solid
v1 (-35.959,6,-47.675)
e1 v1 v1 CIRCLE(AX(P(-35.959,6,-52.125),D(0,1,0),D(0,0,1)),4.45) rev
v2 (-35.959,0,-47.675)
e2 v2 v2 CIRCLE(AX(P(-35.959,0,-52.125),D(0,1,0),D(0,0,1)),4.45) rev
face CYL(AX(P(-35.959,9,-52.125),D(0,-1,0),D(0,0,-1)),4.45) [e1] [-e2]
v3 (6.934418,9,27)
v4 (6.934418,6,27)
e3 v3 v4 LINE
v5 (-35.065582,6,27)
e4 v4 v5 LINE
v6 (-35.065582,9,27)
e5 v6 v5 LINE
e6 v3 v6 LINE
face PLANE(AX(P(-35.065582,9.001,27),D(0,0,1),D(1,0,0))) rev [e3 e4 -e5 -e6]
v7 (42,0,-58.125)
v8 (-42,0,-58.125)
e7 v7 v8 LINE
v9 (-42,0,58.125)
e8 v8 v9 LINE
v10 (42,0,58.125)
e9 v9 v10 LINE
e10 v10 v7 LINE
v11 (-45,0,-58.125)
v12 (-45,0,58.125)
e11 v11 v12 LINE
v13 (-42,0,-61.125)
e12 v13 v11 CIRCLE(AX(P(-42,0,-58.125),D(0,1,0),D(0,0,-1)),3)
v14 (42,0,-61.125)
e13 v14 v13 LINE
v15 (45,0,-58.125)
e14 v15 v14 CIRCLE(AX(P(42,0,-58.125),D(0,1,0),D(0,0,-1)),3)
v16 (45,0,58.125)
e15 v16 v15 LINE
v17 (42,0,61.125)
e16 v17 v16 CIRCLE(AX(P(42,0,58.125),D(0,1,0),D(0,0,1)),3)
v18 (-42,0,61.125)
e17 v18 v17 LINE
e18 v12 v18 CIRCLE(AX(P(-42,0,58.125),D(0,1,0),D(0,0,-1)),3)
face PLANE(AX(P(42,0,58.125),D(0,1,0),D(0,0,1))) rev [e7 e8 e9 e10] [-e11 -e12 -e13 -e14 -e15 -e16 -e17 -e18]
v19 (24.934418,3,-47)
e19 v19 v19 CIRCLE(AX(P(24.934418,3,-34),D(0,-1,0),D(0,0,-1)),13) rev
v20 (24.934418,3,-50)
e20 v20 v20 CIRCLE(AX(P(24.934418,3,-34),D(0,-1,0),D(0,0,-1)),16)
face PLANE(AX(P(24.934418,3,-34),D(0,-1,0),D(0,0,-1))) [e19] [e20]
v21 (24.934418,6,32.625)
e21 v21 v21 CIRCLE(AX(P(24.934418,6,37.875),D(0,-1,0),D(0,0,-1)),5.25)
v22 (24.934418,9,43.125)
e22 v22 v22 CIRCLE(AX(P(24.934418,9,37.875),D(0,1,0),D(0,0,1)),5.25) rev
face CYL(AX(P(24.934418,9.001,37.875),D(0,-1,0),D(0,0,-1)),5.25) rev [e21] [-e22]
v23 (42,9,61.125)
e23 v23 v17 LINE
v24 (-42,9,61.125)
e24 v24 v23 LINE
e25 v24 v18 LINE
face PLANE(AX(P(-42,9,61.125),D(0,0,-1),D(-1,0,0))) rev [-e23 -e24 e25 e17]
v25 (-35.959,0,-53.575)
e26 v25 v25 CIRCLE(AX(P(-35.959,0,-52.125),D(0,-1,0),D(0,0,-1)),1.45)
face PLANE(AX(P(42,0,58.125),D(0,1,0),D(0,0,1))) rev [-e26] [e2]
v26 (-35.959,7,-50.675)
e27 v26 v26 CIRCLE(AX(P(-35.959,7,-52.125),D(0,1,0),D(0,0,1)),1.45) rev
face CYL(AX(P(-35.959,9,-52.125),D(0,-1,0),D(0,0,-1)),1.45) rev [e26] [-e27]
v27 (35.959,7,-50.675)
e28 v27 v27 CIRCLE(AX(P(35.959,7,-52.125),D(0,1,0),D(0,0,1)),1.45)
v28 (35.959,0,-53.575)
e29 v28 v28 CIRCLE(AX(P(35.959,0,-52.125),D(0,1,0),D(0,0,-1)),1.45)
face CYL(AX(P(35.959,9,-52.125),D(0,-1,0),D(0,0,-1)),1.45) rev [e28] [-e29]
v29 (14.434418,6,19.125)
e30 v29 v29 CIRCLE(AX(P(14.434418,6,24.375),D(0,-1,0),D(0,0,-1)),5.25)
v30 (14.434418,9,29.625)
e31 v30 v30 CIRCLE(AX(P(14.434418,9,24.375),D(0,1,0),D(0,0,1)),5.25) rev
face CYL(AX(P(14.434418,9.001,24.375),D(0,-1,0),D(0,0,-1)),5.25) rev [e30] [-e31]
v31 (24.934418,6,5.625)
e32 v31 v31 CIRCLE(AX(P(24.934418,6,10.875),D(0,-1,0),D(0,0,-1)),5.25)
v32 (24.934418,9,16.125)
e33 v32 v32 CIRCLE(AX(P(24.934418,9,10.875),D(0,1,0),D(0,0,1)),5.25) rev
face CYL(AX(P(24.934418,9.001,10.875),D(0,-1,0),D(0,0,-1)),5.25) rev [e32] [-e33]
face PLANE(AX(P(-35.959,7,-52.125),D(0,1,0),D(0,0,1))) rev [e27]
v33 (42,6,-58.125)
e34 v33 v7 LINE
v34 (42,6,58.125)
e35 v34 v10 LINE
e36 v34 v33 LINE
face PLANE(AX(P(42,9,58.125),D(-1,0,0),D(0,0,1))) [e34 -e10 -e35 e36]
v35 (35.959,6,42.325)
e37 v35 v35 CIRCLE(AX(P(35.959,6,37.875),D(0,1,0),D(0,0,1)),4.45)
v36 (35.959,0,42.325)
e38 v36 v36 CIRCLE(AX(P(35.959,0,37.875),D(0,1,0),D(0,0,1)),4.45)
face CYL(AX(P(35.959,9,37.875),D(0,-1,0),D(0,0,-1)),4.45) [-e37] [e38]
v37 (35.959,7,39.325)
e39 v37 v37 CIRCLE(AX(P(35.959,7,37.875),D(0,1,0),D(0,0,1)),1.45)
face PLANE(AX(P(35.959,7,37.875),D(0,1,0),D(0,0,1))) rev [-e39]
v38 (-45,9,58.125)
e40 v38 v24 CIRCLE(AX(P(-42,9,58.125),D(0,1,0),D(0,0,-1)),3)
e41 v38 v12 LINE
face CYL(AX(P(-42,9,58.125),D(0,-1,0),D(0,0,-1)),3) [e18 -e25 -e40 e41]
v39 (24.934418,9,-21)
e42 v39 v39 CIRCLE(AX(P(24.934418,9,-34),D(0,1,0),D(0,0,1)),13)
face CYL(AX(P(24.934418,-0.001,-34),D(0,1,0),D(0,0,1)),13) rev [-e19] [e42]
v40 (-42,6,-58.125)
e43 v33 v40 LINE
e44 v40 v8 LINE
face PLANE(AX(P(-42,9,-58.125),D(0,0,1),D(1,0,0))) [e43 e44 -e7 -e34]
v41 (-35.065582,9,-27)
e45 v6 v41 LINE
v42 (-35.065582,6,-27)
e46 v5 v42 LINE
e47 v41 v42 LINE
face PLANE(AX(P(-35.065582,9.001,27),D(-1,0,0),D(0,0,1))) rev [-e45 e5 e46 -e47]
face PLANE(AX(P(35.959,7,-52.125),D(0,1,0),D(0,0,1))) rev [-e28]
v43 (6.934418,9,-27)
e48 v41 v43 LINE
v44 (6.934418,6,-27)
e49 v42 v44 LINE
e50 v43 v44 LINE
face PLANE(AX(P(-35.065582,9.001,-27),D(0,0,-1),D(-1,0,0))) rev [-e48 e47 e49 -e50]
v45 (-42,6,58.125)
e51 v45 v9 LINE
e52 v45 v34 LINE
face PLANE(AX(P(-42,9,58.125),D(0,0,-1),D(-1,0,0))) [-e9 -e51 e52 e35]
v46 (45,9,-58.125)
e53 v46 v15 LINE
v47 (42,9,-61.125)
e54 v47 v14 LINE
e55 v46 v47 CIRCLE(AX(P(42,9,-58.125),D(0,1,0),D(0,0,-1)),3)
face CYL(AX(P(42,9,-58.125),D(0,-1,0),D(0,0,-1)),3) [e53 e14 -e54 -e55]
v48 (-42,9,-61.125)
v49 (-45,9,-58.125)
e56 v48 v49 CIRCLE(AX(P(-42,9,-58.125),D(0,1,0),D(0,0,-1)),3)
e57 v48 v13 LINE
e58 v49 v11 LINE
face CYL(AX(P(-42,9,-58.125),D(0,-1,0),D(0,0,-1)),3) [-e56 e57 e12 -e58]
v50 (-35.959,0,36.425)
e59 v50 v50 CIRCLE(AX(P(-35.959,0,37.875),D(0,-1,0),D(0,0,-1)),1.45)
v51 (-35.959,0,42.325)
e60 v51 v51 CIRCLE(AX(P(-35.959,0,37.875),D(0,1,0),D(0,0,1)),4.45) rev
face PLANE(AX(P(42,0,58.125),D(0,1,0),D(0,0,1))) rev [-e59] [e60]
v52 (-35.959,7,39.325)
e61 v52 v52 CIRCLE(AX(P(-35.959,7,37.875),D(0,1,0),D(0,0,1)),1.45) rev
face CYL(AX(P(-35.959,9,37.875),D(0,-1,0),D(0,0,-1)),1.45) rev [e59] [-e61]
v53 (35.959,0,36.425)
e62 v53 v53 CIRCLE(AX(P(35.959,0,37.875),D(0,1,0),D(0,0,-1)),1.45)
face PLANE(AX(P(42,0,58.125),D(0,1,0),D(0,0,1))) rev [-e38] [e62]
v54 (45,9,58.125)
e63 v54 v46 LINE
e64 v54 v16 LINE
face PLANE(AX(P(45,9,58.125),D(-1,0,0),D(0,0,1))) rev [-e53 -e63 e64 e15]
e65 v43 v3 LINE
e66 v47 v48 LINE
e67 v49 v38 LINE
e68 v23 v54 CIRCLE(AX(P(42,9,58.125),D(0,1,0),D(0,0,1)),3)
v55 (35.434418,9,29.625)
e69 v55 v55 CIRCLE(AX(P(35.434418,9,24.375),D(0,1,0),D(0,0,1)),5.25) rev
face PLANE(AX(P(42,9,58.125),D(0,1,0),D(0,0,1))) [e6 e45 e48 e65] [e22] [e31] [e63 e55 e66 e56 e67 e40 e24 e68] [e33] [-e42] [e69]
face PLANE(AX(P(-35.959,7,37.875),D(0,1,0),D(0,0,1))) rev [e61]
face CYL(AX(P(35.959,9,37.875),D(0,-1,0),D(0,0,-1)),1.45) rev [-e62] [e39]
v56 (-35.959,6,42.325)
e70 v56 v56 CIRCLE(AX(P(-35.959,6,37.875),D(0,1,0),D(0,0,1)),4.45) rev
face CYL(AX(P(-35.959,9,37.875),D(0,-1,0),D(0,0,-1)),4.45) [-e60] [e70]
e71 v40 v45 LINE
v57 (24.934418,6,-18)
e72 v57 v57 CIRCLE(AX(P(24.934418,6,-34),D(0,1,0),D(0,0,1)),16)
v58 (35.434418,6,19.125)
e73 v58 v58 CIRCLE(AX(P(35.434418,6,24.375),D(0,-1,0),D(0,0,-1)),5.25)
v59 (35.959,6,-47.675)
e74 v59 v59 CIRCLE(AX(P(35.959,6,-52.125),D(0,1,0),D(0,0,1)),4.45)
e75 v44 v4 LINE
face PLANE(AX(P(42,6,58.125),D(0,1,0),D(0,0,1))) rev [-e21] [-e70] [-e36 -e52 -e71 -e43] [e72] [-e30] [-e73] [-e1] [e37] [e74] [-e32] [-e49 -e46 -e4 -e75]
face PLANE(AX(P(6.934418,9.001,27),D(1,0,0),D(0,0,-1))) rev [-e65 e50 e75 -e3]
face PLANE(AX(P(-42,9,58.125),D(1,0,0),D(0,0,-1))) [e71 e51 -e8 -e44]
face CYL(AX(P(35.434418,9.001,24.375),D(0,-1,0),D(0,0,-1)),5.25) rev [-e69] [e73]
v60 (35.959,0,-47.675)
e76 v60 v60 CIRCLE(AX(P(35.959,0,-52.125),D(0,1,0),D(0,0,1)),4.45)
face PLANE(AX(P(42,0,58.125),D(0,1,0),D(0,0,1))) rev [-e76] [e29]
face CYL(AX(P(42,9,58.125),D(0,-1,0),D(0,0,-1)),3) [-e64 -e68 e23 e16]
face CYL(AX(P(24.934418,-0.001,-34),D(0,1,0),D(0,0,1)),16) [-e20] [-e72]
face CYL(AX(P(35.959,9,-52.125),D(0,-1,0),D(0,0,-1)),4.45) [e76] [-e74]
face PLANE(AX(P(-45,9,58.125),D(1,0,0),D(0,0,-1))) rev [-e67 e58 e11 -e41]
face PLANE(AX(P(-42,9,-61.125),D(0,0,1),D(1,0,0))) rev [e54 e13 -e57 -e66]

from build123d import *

# Parameters (mm, degrees)
BOSS_EXTRUDE1_DEPTH = 9
SKETCH2_R           = 1.45
CUT_EXTRUDE1_DEPTH  = 77.43471479
CUT_EXTRUDE2_REACH  = 78.435
SKETCH4_R           = 13
SHELL10_OUTLINE_W   = 84
SHELL10_OUTLINE_H   = 116.25
SHELL10_OUTLINE_R   = 4.45
SHELL10_OUTLINE_R_2 = 16
SHELL10_DEPTH       = 6
SKETCH5_R           = 16
CUT_EXTRUDE3_DEPTH  = 3
CUT_EXTRUDE4_REACH  = 78.14
SKETCH6_R           = 5.25
SKETCH6_W           = 42
SKETCH6_H           = 54
BOSS_EXTRUDE2_START = -2
SKETCH7_R           = 1.45
BOSS_EXTRUDE2_DEPTH = 2


# Read off the part's stored shape, not the designer's step: Shell10
with BuildPart() as part:
    # Sketch1 → Boss-Extrude1 (new body)
    with BuildSketch(Plane(origin=(0, 0, 0), x_dir=(1, 0, 0), z_dir=(0, 1, 0))):
        with BuildLine():
            Line((-42, -61.125), (42, -61.125))
            ThreePointArc((42, -61.125), (44.121320344, -60.246320344), (45, -58.125))
            Line((45, -58.125), (45, 58.125))
            ThreePointArc((45, 58.125), (44.121320344, 60.246320344), (42, 61.125))
            Line((42, 61.125), (-42, 61.125))
            ThreePointArc((-42, 61.125), (-44.121320344, 60.246320344), (-45, 58.125))
            Line((-45, 58.125), (-45, -58.125))
            ThreePointArc((-45, -58.125), (-44.121320344, -60.246320344), (-42, -61.125))
        make_face()
    extrude(amount=BOSS_EXTRUDE1_DEPTH)

    # Sketch2 → Cut-Extrude1 (cut, through all)
    with BuildSketch(Plane.XZ):
        with Locations(Location((-35.959, -52.125, 0), (0, 0, 270))):
            Circle(SKETCH2_R)
        with Locations(Location((-35.959, 37.875, 0), (0, 0, 270))):
            Circle(SKETCH2_R)
    cut_extrude1 = extrude(amount=-CUT_EXTRUDE1_DEPTH, mode=Mode.SUBTRACT)

    # Sketch4 → Cut-Extrude2 (cut, up to next)
    with BuildSketch(Plane(origin=(0, 9, 0), x_dir=(1, 0, 0), z_dir=(0, 1, 0)), mode=Mode.PRIVATE) as cut_extrude2_sk1:
        with Locations(Location((24.934417701, 34, 0), (0, 0, 270))):
            Circle(SKETCH4_R)
    cut_extrude2_tool1 = extrude(cut_extrude2_sk1.sketch, amount=-CUT_EXTRUDE2_REACH, mode=Mode.PRIVATE) & part.part
    add(cut_extrude2_tool1.solids().sort_by_distance((24.934418, 9, -34))[0], mode=Mode.SUBTRACT)

    # Mirror3: Cut-Extrude1 across plane
    add(cut_extrude1.mirror(Plane(origin=(0, 0, 0), x_dir=(0, 0, 1), z_dir=(1, 0, 0))), mode=Mode.SUBTRACT)

    # Shell10 outline → Shell10 (cut)
    with BuildSketch(Plane(origin=(0, 0, 0), x_dir=(1, 0, 0), z_dir=(0, 1, 0))):
        Rectangle(SHELL10_OUTLINE_W, SHELL10_OUTLINE_H)
        with Locations((-35.959, -37.875)):
            Circle(SHELL10_OUTLINE_R, mode=Mode.SUBTRACT)
        with Locations((35.959, -37.875)):
            Circle(SHELL10_OUTLINE_R, mode=Mode.SUBTRACT)
        with Locations((-35.959, 52.125)):
            Circle(SHELL10_OUTLINE_R, mode=Mode.SUBTRACT)
        with Locations((24.934417701, 34)):
            Circle(SHELL10_OUTLINE_R_2, mode=Mode.SUBTRACT)
        with Locations((35.959, 52.125)):
            Circle(SHELL10_OUTLINE_R, mode=Mode.SUBTRACT)
    extrude(amount=SHELL10_DEPTH, mode=Mode.SUBTRACT)

    # Sketch5 → Cut-Extrude3 (cut)
    with BuildSketch(Plane.XZ):
        with Locations(Location((24.934417701, -34, 0), (0, 0, 90))):
            Circle(SKETCH5_R)
    extrude(amount=-CUT_EXTRUDE3_DEPTH, mode=Mode.SUBTRACT)

    # Sketch6 → Cut-Extrude4 (cut, up to next)
    with BuildSketch(Plane.XZ.offset(-6), mode=Mode.PRIVATE) as cut_extrude4_sk1:
        with Locations(Location((35.434417701, 24.375, 0), (0, 0, 270))):
            Circle(SKETCH6_R)
    cut_extrude4_tool1 = extrude(cut_extrude4_sk1.sketch, amount=-CUT_EXTRUDE4_REACH, mode=Mode.PRIVATE) & part.part
    # Sketch6 → Cut-Extrude4 (cut, up to next)
    with BuildSketch(Plane.XZ.offset(-6), mode=Mode.PRIVATE) as cut_extrude4_sk2:
        with Locations(Location((14.434417701, 24.375, 0), (0, 0, 270))):
            Circle(SKETCH6_R)
    cut_extrude4_tool2 = extrude(cut_extrude4_sk2.sketch, amount=-CUT_EXTRUDE4_REACH, mode=Mode.PRIVATE) & part.part
    # Sketch6 → Cut-Extrude4 (cut, up to next)
    with BuildSketch(Plane.XZ.offset(-6), mode=Mode.PRIVATE) as cut_extrude4_sk3:
        with Locations(Location((24.934417701, 10.875, 0), (0, 0, 270))):
            Circle(SKETCH6_R)
    cut_extrude4_tool3 = extrude(cut_extrude4_sk3.sketch, amount=-CUT_EXTRUDE4_REACH, mode=Mode.PRIVATE) & part.part
    # Sketch6 → Cut-Extrude4 (cut, up to next)
    with BuildSketch(Plane.XZ.offset(-6), mode=Mode.PRIVATE) as cut_extrude4_sk4:
        with Locations(Location((24.934417701, 37.875, 0), (0, 0, 270))):
            Circle(SKETCH6_R)
    cut_extrude4_tool4 = extrude(cut_extrude4_sk4.sketch, amount=-CUT_EXTRUDE4_REACH, mode=Mode.PRIVATE) & part.part
    # Sketch6 → Cut-Extrude4 (cut, up to next)
    with BuildSketch(Plane.XZ.offset(-6), mode=Mode.PRIVATE) as cut_extrude4_sk5:
        with Locations((-14.065582299, 0)):
            Rectangle(SKETCH6_W, SKETCH6_H)
    cut_extrude4_tool5 = extrude(cut_extrude4_sk5.sketch, amount=-CUT_EXTRUDE4_REACH, mode=Mode.PRIVATE) & part.part
    add(cut_extrude4_tool1.solids().sort_by_distance((35.434418, 6, 24.375))[0], mode=Mode.SUBTRACT)
    add(cut_extrude4_tool2.solids().sort_by_distance((14.434418, 6, 24.375))[0], mode=Mode.SUBTRACT)
    add(cut_extrude4_tool3.solids().sort_by_distance((24.934418, 6, 10.875))[0], mode=Mode.SUBTRACT)
    add(cut_extrude4_tool4.solids().sort_by_distance((24.934418, 6, 37.875))[0], mode=Mode.SUBTRACT)
    add(cut_extrude4_tool5.solids().sort_by_distance((-14.065582, 6, 0))[0], mode=Mode.SUBTRACT)

    # Sketch7 → Boss-Extrude2 (add)
    with BuildSketch(Plane(origin=(0, 9, 0), x_dir=(1, 0, 0), z_dir=(0, 1, 0)).offset(BOSS_EXTRUDE2_START)):
        with Locations(Location((-35.959, -37.875, 0), (0, 0, 90))):
            Circle(SKETCH7_R)
        with Locations(Location((-35.959, 52.125, 0), (0, 0, 90))):
            Circle(SKETCH7_R)
        with Locations(Location((35.959, 52.125, 0), (0, 0, 90))):
            Circle(SKETCH7_R)
        with Locations(Location((35.959, -37.875, 0), (0, 0, 90))):
            Circle(SKETCH7_R)
    extrude(amount=BOSS_EXTRUDE2_DEPTH)


solid = part.part
